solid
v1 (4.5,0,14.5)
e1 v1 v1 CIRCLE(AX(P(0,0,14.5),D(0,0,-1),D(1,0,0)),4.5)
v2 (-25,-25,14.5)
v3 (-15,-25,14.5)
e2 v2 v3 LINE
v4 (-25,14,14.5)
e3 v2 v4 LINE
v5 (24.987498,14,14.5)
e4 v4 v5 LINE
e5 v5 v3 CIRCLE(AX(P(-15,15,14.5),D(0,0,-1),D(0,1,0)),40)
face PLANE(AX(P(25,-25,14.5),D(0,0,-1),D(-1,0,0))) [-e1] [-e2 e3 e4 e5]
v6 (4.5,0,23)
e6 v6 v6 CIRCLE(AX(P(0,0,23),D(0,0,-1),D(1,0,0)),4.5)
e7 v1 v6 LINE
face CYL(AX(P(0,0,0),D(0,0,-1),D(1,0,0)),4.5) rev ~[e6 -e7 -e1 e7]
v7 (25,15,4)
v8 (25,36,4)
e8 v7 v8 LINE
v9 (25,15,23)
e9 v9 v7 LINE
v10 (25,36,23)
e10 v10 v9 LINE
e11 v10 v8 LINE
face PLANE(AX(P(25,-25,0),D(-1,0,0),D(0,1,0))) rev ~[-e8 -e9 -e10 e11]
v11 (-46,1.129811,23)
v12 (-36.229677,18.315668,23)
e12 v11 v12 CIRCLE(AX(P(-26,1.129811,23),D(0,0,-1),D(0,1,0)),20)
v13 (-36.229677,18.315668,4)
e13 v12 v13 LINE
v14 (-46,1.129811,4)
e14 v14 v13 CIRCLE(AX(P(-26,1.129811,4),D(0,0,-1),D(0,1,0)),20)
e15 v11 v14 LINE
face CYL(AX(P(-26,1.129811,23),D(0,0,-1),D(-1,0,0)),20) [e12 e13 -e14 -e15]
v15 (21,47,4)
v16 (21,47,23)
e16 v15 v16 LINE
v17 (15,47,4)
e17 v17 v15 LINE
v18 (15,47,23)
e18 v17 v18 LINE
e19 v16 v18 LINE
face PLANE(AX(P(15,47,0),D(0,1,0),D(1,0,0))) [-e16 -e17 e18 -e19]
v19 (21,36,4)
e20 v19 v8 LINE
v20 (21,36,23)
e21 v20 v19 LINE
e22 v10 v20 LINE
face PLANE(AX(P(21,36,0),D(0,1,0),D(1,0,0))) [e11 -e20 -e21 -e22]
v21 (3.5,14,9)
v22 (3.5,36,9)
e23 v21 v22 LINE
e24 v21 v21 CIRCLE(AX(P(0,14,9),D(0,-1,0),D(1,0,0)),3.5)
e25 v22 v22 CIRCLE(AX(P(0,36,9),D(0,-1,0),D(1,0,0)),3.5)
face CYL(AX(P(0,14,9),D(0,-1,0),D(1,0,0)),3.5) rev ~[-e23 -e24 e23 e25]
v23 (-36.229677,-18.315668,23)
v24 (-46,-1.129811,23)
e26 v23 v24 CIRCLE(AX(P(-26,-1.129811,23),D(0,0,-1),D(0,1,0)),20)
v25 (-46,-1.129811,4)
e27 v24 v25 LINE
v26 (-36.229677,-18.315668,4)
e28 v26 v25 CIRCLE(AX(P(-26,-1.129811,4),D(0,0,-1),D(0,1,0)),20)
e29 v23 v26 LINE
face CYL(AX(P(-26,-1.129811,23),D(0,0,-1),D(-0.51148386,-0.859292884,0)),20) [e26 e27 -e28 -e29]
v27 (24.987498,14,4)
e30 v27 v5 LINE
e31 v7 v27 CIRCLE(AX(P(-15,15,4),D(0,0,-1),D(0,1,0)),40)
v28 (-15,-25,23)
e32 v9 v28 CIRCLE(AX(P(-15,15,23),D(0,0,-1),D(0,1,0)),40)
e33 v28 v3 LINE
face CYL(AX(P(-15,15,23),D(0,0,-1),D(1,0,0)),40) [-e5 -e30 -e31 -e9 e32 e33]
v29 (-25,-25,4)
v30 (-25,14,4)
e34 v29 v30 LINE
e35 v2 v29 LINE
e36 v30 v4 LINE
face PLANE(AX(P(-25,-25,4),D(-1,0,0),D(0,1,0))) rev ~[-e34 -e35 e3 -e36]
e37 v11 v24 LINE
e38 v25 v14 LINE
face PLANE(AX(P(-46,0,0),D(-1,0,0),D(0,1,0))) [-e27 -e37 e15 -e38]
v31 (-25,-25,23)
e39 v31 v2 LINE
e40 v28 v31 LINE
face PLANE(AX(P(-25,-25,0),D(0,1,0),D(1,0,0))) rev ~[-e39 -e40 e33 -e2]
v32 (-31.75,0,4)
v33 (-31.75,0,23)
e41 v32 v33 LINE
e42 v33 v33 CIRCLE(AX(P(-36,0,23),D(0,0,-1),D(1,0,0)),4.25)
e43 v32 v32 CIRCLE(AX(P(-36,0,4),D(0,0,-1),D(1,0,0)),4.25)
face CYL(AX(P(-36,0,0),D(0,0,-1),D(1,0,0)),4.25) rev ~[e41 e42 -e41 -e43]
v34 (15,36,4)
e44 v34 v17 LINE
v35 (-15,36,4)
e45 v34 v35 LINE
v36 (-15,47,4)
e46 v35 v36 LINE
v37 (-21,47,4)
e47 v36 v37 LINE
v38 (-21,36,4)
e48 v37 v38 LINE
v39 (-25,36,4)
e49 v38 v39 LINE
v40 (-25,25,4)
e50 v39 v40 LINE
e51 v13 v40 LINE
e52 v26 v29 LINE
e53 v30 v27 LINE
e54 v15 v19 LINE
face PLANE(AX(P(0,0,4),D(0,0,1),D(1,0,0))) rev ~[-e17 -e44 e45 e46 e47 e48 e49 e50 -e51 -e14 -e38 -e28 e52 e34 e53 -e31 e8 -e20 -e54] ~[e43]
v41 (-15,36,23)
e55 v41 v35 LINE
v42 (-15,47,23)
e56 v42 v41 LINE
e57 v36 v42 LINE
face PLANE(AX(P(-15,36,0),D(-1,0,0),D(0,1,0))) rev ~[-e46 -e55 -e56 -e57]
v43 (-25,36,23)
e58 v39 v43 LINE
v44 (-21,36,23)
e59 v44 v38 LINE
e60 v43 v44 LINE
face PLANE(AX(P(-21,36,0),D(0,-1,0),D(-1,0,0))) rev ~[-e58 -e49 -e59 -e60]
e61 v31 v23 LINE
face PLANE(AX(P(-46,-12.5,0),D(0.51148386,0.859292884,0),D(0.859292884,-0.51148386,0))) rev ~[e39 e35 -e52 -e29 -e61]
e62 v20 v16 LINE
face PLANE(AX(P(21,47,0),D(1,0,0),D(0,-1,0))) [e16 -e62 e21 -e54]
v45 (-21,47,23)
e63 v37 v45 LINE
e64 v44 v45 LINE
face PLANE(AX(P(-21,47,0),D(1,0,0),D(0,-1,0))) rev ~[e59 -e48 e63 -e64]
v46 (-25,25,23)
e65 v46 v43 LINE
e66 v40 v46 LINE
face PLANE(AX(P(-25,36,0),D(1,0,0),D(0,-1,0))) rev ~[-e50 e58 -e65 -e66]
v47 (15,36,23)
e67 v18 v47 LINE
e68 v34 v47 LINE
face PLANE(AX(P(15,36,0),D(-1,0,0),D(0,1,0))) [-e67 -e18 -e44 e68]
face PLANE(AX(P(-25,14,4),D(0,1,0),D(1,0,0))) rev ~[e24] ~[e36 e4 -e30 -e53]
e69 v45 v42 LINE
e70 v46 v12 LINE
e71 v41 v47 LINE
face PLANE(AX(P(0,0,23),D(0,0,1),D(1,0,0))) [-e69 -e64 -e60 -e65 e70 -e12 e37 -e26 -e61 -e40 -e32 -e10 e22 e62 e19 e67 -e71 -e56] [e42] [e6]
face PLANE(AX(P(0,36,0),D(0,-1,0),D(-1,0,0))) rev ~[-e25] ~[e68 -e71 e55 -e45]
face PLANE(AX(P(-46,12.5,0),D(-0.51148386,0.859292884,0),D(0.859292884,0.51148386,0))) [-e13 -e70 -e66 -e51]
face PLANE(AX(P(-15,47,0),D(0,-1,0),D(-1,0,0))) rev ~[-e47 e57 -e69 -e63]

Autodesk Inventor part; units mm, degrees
ref_plane "YZ Plane" through (0, 0, 0) normal (1, 0, 0) x (0, 1, 0)
ref_plane "XZ Plane" through (0, 0, 0) normal (0, 1, 0) x (-1, 0, 0)
ref_plane "XY Plane" through (0, 0, 0) normal (0, 0, 1) x (1, 0, 0)
sketch "Sketch1" plane through (0, 0, 0) normal (0, 0, 1) x (1, 0, 0)
  line L0 (-21, -21) -> (21, -21)
  line L1 (21, -21) -> (21, 21)
  line L2 (21, 21) -> (-21, 21)
  line L3 (-21, 21) -> (-21, -21)
  line L4 (-21, -21) -> (21, 21) construction
  line L5 (21, -21) -> (-21, 21) construction
  circle A0 centre (0, 0) radius 4.5
  circle A1 centre (-36, 0) radius 4.25
  line L6 (-46, 0) -> (-46, 12.5)
  line L7 (-46, 0) -> (-46, -12.5)
  line L8 (-25, -25) -> (25, -25)
  line L9 (25, -25) -> (25, 25)
  line L10 (-25, -25) -> (25, 25) construction
  line L11 (25, -25) -> (-25, 25) construction
  line L12 (-46, 12.5) -> (-25, 25)
  line L13 (-46, -12.5) -> (-25, -25)
  line L14 (0, 36) -> (15, 36)
  line L15 (15, 36) -> (15, 47)
  line L16 (15, 47) -> (21, 47)
  line L17 (21, 47) -> (21, 36)
  line L18 (21, 36) -> (25, 36)
  line L19 (25, 36) -> (25, 25)
  line L20 (0, 36) -> (-15, 36)
  line L21 (-15, 36) -> (-15, 47)
  line L22 (-15, 47) -> (-21, 47)
  line L23 (-21, 47) -> (-21, 36)
  line L24 (-21, 36) -> (-25, 36)
  line L25 (-25, 36) -> (-25, 25)
  line L26 (-25, 25) -> (25, 25)
  dimension "d0" = 42
  dimension "d1" = 42
  dimension "d2" = 9
  dimension "d5" = 8.5
  dimension "d6" = 46
  dimension "d10" = 50
  dimension "d12" = 15
  dimension "d14" = 6
  dimension "d15" = 11
  dimension "d21" = 11
  dimension "d22" = 50
  dimension "d23" = 25
  dimension "d24" = 4
extrude "Extrusion1" add sketch "Sketch1" along normal blind 15 contours L3 L2 L1 L0 | L6 L12 L26 L9 L8 L13 L7 | L25 L24 L23 L22 L21 L20 L14 L15 L16 L17 L18 L19 L26
move faces "Move1" translate (0, 0, 10) faces at (0.1808, -18.1557, 15)
sketch "Sketch2" plane through (-25, -25, 25) normal (0, 0, 1) x (1, 0, 0)
  line L0 (0, 5) -> (50, 45) construction
  line L1 (50, 5) -> (0, 45) construction
  line L2 (50, 0) -> (50, 61) projected
  line L3 (50, 0) -> (0, 0)
  line L4 (0, 0) -> (0, 40)
  line L5 (0, 40) -> (50, 40)
  line L6 (50, 40) -> (50, 0)
  point P0 (25, 25)
  dimension "d32" = 50
  dimension "d33" = 40
sketch "Sketch3" plane through (-25, -25, 25) normal (0, 0, 1) x (1, 0, 0)
  line L0 (50, 0) -> (50, 61) projected
  line L1 (50, 0) -> (0, 0)
  line L2 (0, 0) -> (0, 38)
  line L3 (0, 38) -> (50, 38)
  line L4 (50, 38) -> (50, 0)
  point P0 (25, 25)
  dimension "d34" = 50
  dimension "d35" = 38
move faces "Move2" translate (0, 0, -2) faces at (18.1231, 4.0256, 25)
move faces "Move3" translate (0, 0, 4) faces at (18.1231, 4.0256, 0)
sketch "Sketch5" plane through (25, -25, 4) normal (0, 0, -1) x (-1, 0, 0)
  line L0 (0, 0) -> (0, 61) projected
  line L1 (0, 0) -> (50, 0)
  line L2 (50, 0) -> (50, 39)
  line L3 (50, 39) -> (0, 39)
  line L4 (0, 39) -> (0, 0)
  point P0 (25, 25)
  point P1 (0, 39)
  dimension "d48" = 50
  dimension "d49" = 39
extrude "Extrusion4" cut sketch "Sketch5" against normal blind 10
sketch "Sketch6" plane through (-25, 14, 4) normal (0, -1, 0) x (1, 0, 0)
  circle A0 centre (25, 5) radius 3.5
  line L0 (50, 0) -> (0, 0) projected
  point P0 (25, -4)
  dimension "d52" = 7
  dimension "d53" = 5
move faces "Move4" translate (0, 0, 0.5) faces at (0.1808, -18.1557, 14)
extrude "Extrusion5" cut sketch "Sketch6" against normal blind 30
fillet "Fillet1" radius 40 1 edges at (25, -25, 18.75)
fillet "Fillet2" radius 20 1 edges at (-46, -12.5, 13.5)
fillet "Fillet3" radius 20 1 edges at (-46, 12.5, 13.5)
properties part number "SuporteInferior"
